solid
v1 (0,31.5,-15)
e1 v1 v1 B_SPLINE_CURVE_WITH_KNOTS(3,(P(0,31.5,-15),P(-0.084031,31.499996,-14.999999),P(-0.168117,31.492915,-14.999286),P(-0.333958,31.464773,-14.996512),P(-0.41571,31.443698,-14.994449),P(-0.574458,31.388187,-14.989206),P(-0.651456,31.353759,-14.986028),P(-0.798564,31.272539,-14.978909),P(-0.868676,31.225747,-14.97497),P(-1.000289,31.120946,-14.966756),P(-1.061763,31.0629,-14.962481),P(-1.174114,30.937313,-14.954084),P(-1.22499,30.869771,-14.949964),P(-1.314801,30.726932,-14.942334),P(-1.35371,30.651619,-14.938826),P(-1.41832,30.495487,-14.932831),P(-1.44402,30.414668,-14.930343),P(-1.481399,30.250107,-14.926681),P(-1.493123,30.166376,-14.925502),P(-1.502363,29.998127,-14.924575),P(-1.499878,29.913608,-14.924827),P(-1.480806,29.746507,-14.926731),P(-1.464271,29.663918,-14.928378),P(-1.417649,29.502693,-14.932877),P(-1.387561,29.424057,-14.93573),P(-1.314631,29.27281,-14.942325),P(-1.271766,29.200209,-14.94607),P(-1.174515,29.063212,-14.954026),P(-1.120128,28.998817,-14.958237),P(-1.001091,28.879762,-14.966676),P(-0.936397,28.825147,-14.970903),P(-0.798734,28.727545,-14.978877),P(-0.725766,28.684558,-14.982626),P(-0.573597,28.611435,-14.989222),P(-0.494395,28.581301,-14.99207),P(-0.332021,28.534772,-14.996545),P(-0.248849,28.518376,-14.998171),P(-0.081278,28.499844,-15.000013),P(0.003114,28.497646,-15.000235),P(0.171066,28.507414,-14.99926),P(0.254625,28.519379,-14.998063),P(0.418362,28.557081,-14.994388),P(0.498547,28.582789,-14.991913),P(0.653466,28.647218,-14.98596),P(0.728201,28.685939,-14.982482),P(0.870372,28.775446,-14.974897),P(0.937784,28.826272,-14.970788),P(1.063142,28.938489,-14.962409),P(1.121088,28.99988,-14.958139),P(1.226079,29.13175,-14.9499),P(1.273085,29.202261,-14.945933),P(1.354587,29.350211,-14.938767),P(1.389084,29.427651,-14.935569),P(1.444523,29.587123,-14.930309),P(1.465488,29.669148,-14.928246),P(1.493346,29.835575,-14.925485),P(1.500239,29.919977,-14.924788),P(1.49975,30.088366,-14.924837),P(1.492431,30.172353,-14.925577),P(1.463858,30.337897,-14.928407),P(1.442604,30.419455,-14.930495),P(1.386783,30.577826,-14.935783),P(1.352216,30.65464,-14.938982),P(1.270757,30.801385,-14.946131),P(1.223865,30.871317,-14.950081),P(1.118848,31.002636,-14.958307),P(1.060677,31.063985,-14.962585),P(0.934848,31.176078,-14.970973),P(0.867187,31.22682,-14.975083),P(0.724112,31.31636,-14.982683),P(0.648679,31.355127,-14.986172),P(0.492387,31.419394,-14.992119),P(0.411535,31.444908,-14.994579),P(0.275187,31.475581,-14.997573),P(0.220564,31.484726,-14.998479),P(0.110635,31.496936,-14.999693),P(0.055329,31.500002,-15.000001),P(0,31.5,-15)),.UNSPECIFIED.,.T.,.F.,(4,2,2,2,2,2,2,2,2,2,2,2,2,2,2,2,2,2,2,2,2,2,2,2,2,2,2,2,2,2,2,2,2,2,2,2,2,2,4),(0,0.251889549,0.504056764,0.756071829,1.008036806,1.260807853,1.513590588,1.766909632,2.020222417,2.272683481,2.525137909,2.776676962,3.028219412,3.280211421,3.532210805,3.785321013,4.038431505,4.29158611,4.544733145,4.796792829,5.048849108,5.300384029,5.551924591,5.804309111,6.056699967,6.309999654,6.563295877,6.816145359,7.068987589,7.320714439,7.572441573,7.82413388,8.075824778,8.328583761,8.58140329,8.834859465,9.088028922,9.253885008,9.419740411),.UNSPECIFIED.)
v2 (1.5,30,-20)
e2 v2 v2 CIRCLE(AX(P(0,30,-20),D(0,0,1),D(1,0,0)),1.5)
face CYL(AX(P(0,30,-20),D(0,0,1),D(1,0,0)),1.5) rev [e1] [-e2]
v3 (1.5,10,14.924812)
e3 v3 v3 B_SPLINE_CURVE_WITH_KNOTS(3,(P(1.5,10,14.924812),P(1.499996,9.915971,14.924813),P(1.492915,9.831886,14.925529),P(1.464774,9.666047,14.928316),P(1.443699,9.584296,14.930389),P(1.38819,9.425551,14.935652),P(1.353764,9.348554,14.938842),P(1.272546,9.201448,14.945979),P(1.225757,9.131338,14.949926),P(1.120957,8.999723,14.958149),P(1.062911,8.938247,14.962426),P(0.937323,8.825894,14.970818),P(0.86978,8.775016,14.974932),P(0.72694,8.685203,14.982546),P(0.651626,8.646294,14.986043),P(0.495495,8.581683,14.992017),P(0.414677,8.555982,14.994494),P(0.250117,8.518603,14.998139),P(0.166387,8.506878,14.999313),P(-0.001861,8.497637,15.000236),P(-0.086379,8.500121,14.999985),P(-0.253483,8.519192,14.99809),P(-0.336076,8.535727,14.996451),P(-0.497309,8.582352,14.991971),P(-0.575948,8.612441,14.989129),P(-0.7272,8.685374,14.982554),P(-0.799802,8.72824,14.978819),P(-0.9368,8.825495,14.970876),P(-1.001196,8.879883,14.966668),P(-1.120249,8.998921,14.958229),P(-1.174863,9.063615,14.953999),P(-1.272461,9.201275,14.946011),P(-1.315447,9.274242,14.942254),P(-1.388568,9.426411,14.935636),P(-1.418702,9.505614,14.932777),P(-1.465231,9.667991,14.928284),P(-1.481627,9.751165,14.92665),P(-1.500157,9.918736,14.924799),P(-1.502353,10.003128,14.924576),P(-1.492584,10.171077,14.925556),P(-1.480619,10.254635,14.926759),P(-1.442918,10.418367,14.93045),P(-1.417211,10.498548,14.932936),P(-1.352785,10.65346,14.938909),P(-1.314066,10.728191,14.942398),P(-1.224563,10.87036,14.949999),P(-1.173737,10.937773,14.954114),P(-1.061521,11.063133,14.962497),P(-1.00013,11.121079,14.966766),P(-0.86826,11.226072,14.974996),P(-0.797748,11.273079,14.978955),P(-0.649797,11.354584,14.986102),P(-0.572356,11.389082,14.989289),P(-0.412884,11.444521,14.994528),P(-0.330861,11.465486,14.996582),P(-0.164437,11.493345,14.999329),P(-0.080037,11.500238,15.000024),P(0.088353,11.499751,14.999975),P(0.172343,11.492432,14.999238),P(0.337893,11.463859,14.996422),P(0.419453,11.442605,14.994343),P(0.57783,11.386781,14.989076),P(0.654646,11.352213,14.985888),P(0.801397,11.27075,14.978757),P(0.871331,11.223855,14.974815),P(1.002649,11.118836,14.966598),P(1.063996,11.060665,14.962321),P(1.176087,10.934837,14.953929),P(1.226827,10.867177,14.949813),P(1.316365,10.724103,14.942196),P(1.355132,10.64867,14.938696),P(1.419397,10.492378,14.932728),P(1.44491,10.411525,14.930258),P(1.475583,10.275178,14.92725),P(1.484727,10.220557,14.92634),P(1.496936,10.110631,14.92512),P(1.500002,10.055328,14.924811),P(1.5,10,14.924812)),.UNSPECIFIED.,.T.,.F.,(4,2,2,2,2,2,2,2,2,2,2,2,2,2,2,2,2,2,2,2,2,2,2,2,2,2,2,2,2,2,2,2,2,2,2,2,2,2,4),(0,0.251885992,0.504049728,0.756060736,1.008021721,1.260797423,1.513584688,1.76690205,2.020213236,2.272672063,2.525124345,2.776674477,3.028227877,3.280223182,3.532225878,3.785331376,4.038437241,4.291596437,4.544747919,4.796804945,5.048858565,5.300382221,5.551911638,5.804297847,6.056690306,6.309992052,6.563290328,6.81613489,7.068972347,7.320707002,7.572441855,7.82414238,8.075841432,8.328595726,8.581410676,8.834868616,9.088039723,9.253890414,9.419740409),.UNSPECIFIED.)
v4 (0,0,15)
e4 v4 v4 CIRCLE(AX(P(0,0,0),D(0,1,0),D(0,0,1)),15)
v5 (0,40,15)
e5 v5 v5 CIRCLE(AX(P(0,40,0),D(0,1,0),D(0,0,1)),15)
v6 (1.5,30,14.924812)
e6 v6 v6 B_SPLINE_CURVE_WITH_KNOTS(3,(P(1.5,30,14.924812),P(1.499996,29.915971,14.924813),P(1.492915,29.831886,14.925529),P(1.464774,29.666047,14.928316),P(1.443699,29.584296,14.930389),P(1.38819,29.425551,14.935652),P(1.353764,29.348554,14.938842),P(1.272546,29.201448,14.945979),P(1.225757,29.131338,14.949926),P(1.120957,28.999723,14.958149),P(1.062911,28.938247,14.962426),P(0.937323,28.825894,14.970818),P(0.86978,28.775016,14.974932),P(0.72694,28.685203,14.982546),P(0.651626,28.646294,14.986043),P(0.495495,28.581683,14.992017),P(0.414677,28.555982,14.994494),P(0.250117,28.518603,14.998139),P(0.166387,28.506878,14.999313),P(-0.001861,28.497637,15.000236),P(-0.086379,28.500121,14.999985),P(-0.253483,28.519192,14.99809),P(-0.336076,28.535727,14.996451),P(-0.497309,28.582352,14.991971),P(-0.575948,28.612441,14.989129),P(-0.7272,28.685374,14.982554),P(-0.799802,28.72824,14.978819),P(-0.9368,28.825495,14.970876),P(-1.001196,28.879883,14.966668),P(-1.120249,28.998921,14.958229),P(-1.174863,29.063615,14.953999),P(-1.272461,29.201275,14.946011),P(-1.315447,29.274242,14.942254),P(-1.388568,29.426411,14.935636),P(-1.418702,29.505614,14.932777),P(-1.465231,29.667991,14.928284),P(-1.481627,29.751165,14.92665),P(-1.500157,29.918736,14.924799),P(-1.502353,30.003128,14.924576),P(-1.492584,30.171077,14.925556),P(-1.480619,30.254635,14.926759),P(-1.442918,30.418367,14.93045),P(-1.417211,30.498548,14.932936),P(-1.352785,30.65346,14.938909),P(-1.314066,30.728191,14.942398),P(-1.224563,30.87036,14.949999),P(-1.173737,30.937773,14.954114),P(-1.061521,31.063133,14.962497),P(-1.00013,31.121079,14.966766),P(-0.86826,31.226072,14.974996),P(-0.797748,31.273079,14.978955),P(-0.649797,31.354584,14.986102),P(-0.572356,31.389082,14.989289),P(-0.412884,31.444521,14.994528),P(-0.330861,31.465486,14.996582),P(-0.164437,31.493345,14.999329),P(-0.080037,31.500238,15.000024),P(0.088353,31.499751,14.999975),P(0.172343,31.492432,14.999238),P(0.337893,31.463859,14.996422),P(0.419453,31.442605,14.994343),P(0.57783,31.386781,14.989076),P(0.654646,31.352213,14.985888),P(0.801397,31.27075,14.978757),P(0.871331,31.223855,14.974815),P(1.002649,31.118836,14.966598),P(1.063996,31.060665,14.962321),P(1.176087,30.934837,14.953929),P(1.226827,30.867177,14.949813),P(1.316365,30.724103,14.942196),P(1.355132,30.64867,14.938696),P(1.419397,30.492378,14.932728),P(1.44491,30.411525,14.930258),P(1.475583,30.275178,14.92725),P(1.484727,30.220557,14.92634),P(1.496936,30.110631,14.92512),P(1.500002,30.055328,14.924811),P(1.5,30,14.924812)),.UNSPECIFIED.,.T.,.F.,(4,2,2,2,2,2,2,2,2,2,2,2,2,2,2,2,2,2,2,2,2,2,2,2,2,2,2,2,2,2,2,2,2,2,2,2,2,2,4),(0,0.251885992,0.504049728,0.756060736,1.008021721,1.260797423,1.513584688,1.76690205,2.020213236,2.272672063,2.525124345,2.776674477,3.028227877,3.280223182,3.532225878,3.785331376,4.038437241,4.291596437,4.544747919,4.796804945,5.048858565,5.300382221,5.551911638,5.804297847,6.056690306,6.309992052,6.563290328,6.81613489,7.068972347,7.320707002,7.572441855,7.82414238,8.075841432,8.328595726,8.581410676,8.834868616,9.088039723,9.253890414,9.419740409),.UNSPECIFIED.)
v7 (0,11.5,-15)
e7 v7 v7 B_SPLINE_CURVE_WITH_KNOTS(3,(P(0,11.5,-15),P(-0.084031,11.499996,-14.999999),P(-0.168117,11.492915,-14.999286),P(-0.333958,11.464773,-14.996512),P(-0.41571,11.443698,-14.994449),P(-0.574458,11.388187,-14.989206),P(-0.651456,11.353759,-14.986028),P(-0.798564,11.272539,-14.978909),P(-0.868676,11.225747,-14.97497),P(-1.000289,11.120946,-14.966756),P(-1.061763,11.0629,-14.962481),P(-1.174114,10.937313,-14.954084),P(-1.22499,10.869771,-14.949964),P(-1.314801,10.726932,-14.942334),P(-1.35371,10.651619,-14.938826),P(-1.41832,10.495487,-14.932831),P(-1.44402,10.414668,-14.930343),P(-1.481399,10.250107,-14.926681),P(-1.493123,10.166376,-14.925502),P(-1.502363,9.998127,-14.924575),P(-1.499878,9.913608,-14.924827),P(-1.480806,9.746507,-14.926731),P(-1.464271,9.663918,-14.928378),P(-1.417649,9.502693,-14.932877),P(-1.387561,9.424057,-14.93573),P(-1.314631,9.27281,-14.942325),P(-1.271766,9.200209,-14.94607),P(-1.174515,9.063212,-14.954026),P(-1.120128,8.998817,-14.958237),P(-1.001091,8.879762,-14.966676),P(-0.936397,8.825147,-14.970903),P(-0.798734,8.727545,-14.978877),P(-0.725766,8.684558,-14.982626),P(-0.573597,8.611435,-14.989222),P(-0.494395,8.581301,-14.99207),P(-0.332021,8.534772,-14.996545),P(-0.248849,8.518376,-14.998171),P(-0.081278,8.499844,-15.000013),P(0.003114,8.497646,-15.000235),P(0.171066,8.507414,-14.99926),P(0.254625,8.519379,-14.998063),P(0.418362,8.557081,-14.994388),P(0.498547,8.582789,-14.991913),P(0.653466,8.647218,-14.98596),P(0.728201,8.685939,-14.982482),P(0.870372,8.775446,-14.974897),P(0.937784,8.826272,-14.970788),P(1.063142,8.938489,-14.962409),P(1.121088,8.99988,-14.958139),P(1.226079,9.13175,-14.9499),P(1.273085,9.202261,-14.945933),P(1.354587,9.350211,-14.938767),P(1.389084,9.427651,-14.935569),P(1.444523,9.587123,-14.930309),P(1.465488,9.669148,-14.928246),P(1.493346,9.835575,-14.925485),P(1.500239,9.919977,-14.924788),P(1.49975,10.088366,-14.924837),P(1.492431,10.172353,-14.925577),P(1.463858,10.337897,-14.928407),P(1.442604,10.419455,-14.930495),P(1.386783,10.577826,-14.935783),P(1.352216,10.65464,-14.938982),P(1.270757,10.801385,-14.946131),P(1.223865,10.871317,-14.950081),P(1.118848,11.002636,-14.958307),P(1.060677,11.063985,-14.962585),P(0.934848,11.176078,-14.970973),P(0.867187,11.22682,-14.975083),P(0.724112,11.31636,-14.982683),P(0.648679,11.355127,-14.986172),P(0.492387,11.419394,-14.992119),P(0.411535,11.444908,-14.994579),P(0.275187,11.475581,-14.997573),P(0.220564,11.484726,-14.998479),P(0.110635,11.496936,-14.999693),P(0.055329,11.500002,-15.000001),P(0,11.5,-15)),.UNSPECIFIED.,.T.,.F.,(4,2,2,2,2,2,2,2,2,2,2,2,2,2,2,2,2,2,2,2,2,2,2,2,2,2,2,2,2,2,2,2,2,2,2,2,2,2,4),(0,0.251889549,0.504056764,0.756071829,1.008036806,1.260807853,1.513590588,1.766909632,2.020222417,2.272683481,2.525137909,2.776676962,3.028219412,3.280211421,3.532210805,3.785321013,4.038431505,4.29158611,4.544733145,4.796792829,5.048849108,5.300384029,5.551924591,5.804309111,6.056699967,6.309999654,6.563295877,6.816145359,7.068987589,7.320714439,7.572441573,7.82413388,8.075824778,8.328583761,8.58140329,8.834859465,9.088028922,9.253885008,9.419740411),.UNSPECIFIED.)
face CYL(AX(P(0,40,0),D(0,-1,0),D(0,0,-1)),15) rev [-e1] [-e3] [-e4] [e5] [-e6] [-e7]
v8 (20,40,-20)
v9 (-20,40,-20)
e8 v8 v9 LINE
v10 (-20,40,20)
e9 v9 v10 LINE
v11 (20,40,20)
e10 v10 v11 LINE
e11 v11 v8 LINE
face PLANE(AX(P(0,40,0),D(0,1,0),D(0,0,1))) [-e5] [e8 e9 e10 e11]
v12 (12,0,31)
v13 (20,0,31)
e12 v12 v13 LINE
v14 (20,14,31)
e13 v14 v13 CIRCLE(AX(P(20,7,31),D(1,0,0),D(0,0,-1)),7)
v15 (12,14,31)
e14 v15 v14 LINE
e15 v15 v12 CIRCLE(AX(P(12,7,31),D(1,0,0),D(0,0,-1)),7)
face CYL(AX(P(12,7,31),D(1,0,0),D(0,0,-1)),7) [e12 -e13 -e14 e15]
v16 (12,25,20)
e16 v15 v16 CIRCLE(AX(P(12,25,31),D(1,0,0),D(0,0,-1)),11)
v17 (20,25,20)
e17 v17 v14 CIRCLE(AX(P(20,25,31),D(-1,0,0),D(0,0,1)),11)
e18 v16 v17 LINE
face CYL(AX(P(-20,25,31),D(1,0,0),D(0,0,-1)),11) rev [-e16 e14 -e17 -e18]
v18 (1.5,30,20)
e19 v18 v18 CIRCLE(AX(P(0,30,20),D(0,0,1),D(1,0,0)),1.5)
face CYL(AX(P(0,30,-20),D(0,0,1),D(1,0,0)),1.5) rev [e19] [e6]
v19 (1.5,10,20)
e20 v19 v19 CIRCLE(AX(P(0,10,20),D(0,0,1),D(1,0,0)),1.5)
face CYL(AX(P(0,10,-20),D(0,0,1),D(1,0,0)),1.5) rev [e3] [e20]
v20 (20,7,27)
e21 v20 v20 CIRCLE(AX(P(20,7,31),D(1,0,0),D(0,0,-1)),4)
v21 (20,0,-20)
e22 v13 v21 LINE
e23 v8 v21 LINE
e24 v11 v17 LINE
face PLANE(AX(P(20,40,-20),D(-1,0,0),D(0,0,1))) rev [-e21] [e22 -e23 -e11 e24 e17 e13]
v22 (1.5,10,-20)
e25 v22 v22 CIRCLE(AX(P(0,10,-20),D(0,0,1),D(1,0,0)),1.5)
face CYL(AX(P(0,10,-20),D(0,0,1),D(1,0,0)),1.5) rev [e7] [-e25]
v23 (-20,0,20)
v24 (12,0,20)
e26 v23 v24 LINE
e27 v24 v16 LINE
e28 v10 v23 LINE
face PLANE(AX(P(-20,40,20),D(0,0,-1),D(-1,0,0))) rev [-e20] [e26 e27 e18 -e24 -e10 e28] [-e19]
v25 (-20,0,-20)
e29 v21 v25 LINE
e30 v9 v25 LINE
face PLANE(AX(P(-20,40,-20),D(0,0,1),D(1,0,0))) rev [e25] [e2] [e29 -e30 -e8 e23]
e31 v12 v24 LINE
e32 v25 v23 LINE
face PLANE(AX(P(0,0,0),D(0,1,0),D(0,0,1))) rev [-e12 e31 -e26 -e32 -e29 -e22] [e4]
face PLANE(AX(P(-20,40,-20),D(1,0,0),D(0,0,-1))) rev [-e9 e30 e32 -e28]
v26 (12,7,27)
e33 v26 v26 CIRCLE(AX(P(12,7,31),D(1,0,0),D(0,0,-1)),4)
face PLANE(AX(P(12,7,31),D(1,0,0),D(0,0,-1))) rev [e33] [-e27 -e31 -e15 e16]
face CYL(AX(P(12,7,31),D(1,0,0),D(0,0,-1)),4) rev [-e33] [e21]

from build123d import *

# Parameters (mm, degrees)
SKETCH_1_W          = 40
SKETCH_1_H          = 40
SKETCH_1_R          = 15
EXTRUDE_1_DEPTH     = 40
SKETCH_2_R          = 1.5
CUT_EXTRUDE_1_DEPTH = 61
SKETCH_3_R          = 4
EXTRUDE_2_DEPTH     = 8
FILLET_1_R          = 11


with BuildPart() as part:
    # 草圖1 → 填料-伸長1 (new body)
    with BuildSketch(Plane(origin=(0, 0, 0), x_dir=(1, 0, 0), z_dir=(0, 1, 0))):
        Rectangle(SKETCH_1_W, SKETCH_1_H)
        with Locations(Location((0, 0, 0), (0, 0, 270))):
            Circle(SKETCH_1_R, mode=Mode.SUBTRACT)
    extrude(amount=EXTRUDE_1_DEPTH)

    # 草圖2 → 除料-伸長1 (cut, through all)
    with BuildSketch(Plane.XY.offset(20)):
        with Locations((0, 10)):
            Circle(SKETCH_2_R)
        with Locations((0, 30)):
            Circle(SKETCH_2_R)
    extrude(amount=-CUT_EXTRUDE_1_DEPTH, mode=Mode.SUBTRACT)

    # 草圖3 → 填料-伸長2 (add)
    with BuildSketch(Plane(origin=(20, 0, 0), x_dir=(0, 0, -1), z_dir=(1, 0, 0))):
        with BuildLine():
            Line((-20, 0), (-31, 0))
            ThreePointArc((-31, 0), (-38, 7), (-31, 14))
            Line((-31, 14), (-20, 14))
            Line((-20, 14), (-20, 0))
        make_face()
        with Locations((-31, 7)):
            Circle(SKETCH_3_R, mode=Mode.SUBTRACT)
    extrude(amount=-EXTRUDE_2_DEPTH)

    # 圓角1
    fillet_1_edges = [part.edges().sort_by_distance(p)[0] for p in [
        (16, 14, 20),
    ]]
    fillet(fillet_1_edges, radius=FILLET_1_R - 0.0001)  # a hair under: the kernel refuses the full size


solid = part.part
